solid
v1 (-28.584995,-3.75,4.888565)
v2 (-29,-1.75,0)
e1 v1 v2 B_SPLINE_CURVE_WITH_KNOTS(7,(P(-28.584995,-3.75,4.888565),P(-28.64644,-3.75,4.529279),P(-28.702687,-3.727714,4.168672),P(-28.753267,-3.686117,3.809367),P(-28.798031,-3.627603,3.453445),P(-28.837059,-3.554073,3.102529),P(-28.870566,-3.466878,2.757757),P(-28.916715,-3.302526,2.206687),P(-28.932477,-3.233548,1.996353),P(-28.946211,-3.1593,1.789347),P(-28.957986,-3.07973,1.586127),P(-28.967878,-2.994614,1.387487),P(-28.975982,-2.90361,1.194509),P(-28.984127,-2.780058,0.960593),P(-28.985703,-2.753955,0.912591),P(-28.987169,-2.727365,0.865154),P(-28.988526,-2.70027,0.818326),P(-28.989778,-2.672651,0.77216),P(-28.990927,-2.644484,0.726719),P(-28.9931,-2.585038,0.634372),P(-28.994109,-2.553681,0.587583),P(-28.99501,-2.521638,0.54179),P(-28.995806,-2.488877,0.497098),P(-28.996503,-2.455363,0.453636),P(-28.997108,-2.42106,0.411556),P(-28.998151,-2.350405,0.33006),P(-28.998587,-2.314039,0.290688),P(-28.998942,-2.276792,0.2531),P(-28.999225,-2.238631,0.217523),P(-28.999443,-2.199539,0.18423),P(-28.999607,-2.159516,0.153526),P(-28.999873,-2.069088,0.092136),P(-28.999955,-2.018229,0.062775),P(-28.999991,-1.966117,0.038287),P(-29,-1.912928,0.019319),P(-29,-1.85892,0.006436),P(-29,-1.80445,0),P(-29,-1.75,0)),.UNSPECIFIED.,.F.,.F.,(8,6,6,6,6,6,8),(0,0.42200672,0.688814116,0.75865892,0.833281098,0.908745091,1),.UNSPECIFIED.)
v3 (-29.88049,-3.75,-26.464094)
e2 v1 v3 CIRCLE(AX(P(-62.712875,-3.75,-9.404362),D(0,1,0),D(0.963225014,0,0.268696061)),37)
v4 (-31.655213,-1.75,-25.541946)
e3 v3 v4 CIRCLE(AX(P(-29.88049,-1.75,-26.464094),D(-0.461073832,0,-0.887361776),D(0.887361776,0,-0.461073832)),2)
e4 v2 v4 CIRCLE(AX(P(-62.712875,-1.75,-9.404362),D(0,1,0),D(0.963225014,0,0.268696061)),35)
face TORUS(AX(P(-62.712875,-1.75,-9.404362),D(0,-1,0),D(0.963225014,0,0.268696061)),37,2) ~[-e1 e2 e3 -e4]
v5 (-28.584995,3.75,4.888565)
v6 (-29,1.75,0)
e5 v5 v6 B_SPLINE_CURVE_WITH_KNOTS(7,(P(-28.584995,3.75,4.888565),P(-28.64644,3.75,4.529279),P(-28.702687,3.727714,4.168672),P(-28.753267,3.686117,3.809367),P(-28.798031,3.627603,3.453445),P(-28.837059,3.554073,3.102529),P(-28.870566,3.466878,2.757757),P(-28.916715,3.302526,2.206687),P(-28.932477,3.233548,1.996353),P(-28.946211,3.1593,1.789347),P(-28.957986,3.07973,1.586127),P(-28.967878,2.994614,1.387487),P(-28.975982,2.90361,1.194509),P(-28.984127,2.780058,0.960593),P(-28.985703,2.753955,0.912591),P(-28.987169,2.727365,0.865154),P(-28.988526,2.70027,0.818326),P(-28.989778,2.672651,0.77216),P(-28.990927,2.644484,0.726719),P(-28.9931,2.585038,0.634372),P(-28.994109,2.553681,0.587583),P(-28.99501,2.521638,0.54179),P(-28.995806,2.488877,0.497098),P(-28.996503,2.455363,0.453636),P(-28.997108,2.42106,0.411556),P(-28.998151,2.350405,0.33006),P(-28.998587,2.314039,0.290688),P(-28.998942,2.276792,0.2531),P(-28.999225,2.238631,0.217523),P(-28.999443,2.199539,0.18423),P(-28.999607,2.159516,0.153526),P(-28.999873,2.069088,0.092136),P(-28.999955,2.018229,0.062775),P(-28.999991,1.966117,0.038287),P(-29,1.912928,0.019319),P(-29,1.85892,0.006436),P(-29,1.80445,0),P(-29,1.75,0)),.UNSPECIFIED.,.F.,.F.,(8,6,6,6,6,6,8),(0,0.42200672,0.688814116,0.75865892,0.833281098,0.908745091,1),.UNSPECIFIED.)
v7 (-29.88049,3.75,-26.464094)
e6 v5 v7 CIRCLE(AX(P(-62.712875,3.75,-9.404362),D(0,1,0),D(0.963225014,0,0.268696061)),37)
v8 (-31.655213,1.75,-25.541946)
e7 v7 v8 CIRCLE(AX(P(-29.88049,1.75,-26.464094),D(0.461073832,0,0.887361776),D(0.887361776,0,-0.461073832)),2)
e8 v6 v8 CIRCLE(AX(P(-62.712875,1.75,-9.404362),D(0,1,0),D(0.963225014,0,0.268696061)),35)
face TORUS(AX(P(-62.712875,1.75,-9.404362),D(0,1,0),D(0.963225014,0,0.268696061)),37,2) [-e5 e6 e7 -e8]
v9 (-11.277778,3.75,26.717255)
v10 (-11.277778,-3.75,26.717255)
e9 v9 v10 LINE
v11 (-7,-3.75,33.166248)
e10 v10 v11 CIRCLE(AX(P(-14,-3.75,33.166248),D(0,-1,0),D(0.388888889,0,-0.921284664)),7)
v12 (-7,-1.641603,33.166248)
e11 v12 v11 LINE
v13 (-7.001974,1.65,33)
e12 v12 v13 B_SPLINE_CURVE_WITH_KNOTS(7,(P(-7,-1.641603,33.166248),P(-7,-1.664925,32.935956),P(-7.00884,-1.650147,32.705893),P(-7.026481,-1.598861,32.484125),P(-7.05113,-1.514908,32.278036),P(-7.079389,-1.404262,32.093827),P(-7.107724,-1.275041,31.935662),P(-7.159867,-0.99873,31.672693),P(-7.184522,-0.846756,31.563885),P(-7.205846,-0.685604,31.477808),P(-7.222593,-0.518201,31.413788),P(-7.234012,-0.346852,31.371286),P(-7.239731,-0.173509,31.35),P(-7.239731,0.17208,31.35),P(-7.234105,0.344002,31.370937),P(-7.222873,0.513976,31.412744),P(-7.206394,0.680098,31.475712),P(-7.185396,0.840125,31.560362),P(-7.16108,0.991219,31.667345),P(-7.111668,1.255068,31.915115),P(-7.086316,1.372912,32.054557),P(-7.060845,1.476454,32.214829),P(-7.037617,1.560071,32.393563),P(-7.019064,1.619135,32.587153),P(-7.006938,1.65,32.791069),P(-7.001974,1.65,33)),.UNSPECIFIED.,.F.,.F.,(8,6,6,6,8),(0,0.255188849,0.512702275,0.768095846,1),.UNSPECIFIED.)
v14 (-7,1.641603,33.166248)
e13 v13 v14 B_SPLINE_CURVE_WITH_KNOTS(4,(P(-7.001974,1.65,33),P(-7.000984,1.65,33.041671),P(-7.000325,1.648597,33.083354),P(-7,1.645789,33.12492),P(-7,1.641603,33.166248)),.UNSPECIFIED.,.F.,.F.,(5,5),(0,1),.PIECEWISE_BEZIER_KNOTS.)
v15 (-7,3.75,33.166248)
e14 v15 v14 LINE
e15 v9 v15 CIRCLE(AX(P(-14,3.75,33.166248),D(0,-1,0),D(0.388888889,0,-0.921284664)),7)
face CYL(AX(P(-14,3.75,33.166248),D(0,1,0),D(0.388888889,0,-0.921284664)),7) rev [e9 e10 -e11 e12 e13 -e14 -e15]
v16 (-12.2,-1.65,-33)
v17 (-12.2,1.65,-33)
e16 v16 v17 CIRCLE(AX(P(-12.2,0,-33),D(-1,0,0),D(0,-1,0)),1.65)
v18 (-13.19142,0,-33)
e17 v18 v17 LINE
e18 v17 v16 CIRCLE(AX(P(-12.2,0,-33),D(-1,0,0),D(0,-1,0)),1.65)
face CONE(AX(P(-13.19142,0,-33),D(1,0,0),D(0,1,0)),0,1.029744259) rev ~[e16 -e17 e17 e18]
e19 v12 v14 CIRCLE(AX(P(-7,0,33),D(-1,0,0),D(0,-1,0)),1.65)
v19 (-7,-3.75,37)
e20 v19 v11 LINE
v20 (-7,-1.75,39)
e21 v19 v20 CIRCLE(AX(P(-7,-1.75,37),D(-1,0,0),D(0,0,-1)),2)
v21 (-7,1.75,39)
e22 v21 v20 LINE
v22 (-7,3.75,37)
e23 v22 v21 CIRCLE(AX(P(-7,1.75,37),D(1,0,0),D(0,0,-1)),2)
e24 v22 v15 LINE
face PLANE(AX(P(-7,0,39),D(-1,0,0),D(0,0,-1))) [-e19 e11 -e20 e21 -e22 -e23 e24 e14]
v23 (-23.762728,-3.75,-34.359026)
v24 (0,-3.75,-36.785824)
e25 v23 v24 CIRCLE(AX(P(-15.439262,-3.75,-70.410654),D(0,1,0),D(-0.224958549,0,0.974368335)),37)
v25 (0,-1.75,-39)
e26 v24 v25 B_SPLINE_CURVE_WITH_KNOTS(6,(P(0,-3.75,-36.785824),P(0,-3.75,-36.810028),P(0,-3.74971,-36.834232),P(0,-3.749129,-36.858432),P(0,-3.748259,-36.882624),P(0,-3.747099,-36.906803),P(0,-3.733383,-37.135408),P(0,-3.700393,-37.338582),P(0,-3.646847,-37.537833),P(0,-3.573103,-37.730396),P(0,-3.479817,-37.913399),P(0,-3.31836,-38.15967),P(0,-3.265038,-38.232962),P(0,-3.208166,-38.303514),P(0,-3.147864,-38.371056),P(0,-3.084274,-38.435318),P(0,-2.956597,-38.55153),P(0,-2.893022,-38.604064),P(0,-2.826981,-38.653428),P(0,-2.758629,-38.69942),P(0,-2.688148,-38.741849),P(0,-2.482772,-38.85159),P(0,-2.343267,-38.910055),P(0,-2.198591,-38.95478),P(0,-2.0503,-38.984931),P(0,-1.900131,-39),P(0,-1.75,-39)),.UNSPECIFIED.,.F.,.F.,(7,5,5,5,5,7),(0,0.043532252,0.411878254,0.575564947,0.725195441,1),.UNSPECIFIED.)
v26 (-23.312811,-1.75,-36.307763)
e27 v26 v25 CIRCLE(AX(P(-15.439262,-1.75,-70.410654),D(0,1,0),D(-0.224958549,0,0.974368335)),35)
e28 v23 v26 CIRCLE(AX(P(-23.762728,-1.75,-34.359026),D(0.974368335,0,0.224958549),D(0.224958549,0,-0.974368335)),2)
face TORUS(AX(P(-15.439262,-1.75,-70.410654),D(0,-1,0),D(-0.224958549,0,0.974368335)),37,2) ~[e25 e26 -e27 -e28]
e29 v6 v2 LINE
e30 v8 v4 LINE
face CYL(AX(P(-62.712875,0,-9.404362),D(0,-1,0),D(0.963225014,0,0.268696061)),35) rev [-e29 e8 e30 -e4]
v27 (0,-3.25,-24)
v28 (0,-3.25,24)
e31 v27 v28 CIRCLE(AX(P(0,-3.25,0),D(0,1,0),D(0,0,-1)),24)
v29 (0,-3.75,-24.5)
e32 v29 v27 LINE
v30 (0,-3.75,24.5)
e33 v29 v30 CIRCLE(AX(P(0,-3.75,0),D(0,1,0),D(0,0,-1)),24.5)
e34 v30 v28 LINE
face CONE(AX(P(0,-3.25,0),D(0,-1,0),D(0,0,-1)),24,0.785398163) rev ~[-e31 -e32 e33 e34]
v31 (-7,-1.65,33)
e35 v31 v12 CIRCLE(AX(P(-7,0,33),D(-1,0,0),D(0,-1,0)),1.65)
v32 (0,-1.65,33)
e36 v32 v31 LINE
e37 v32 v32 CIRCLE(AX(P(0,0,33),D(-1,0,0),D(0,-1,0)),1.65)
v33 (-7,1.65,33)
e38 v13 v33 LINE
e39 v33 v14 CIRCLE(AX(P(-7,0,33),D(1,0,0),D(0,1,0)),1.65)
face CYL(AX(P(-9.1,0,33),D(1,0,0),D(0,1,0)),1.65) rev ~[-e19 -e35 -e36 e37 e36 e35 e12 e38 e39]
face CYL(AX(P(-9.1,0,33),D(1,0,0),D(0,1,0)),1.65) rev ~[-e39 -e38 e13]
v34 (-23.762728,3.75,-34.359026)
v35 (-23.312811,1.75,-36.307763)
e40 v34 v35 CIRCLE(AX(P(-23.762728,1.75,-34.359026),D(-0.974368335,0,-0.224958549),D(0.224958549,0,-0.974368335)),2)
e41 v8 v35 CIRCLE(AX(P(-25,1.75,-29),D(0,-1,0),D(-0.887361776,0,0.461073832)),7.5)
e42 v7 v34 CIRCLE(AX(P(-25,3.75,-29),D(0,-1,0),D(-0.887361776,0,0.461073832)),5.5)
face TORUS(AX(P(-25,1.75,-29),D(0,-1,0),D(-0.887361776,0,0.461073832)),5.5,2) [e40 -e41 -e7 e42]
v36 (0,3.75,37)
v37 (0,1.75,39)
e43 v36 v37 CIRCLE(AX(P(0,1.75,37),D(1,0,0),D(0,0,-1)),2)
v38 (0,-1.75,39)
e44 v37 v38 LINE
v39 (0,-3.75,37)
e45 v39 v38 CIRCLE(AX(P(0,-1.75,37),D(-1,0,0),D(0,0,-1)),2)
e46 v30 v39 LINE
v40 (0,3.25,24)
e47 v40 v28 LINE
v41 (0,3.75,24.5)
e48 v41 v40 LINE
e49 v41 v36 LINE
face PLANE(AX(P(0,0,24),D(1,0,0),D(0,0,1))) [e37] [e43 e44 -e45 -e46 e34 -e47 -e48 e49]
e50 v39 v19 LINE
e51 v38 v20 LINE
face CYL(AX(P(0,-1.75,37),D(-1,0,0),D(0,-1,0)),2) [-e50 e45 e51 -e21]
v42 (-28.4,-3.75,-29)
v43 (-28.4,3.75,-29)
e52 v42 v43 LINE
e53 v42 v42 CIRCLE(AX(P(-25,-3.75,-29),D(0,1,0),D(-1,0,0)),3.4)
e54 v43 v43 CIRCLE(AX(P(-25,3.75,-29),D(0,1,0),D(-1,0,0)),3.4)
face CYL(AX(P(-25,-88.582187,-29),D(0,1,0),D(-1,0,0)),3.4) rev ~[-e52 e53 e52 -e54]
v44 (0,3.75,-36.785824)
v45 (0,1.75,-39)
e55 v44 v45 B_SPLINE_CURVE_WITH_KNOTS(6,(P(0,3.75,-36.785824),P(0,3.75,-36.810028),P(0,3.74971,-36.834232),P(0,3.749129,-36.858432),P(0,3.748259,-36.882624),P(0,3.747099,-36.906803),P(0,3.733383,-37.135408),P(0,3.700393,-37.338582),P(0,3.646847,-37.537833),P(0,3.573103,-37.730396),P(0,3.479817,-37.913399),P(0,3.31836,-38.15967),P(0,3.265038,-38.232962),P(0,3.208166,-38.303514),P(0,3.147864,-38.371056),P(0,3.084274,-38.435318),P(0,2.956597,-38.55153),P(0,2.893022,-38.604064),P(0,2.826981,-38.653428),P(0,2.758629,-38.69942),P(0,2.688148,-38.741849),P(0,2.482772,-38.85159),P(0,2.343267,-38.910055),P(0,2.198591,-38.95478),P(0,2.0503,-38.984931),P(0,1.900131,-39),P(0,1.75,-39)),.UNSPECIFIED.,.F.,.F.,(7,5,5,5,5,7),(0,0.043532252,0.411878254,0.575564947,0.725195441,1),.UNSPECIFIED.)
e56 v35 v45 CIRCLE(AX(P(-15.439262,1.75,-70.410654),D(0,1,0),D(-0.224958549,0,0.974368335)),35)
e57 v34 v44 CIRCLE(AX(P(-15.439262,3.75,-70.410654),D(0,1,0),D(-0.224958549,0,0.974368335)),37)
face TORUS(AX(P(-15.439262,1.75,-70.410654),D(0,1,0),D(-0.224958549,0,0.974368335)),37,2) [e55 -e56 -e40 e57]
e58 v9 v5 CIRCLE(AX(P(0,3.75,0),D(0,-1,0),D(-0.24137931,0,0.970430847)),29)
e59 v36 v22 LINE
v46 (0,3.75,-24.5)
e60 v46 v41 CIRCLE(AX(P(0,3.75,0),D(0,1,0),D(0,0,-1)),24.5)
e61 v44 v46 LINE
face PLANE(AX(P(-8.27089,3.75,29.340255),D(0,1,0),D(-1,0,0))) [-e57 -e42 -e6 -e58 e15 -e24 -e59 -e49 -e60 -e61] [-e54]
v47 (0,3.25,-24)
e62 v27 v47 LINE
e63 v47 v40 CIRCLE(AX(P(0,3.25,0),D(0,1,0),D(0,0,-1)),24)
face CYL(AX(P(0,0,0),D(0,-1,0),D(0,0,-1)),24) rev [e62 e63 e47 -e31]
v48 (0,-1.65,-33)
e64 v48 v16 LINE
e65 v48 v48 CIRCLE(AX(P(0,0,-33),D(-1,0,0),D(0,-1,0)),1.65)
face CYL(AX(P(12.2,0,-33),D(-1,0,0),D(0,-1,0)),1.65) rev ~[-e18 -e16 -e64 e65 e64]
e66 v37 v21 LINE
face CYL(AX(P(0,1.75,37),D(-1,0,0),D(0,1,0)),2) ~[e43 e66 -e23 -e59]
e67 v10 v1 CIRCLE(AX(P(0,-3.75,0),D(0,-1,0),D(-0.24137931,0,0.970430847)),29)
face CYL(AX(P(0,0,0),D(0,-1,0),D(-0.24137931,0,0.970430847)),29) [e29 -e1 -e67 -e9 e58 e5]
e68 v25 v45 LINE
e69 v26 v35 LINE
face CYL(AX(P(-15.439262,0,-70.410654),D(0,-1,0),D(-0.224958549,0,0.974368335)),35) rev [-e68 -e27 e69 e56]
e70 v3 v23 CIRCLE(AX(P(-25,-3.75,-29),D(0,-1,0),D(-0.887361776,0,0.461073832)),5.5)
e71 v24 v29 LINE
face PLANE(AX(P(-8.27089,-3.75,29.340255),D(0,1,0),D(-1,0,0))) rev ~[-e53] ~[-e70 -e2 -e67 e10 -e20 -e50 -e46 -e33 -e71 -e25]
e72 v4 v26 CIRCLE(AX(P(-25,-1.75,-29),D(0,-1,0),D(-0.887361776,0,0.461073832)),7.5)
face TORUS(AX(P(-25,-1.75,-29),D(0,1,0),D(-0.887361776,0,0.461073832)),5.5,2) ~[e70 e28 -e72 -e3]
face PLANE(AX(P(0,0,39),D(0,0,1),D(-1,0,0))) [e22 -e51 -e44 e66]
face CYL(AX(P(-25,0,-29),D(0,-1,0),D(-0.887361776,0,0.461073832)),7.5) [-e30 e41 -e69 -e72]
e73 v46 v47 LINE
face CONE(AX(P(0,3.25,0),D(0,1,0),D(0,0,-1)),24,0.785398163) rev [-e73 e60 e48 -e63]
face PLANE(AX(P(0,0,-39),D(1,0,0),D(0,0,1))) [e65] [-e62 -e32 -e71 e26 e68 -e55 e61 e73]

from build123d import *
from build123d import SkipClean  # not in build123d's __all__

# Parameters (mm, degrees)
F1_DEPTH    = 3.75
F3_D        = 3.3
F3_DEPTH    = 12.2
F3_TIP      = 0.9914200214
F4_R        = 2
F5_T4_DEPTH = 7.5
F5_S5_R     = 1.65
F5_T6_DEPTH = 7
F6_SIZE     = 0.5
F8_D        = 6.8


# Not quite as in the source:
# - a fillet or chamfer that OpenCascade refuses, or shapes differently, is made with other operations: its cross-section is extruded or revolved along the edge and cut away or added
# - a feature names something its author has since deleted; it is built from what else it names


with BuildPart() as f1:
    # F0 (on Front) → F1 (new body, symmetric)
    with BuildSketch(Plane.XZ):
        with BuildLine():
            ThreePointArc((0, -24), (-24, 0), (0, 24))
            Line((0, 24), (0, 39))
            Line((0, 39), (-7, 39))
            Line((-7, 39), (-7, 28.1424945589))
            ThreePointArc((-7, 28.1424945589), (-22.8473193176, 17.8605710995), (-29, 0))
            ThreePointArc((-29, 0), (-27.9004726433, -13.0232858743), (-31.6552133192, -25.541946259))
            ThreePointArc((-31.6552133192, -25.541946259), (-30.9284075442, -33.5939072683), (-23.3128108861, -36.3077625094))
            ThreePointArc((-23.3128108861, -36.3077625094), (-11.4240360348, -35.6417318474), (0, -39))
            Line((0, -39), (0, -24))
        make_face()
    extrude(amount=F1_DEPTH, both=True)

    # F3
    with Locations(Plane.YZ):
        with Locations((0, 33), (0, -33)):
            Hole(F3_D / 2, depth=F3_DEPTH)
            with Locations((0, 0, -(F3_DEPTH + F3_TIP / 2))):  # 118° drill point
                Cone(0, F3_D / 2, F3_TIP, mode=Mode.SUBTRACT)

    # F4
    f4_edges = [f1.edges().sort_by_distance(p)[0] for p in [
        (-3.5, 3.75, 39),
        (-3.5, -3.75, 39),
        (-11.424036, 3.75, -35.641732),
        (-11.424036, -3.75, -35.641732),
    ]]
    fillet(f4_edges, radius=F4_R)

    # F5: fillet of radius 7 on 1 edges, made by hand


with BuildPart() as f5_tool2:
    # F5_s3 → F5_t4 (new body)
    with BuildSketch(Plane.XZ.offset(-3.75)):
        with BuildLine():
            ThreePointArc((-11.2777777778, 26.7172552556), (-8.1666666667, 29.2968523148), (-7, 33.1662479036))
            Line((-7, 33.1662479036), (-7, 28.1424945589))
            ThreePointArc((-7, 28.1424945589), (-9.1666306182, 27.5131401899), (-11.2777777778, 26.7172552556))
        make_face()
    extrude(amount=F5_T4_DEPTH)

    # F5_s5 → F5_t6 (cut, symmetric)
    with BuildSketch(Plane.YZ.offset(-9.1)):
        with Locations((0, 33)):
            Circle(F5_S5_R)
    with SkipClean():  # cleaning this boolean's faces spoils the solid; the shape is the same uncleaned
        extrude(amount=F5_T6_DEPTH, both=True, mode=Mode.SUBTRACT)


with BuildPart() as f1_1:
    add(f1.part, clean=False)

    # F5_t1: union F5_tool2
    add(f5_tool2.part)

    # F6
    f6_edges = [f1_1.edges().sort_by_distance(p)[0] for p in [
        (-24, 3.75, 0),
        (-24, -3.75, 0),
    ]]
    chamfer(f6_edges, length=F6_SIZE)

    # F8 (through all)
    with Locations(Plane.XZ.offset(3.75)):
        with Locations((-25, -29)):
            Hole(F8_D / 2)


solid = f1_1.part
